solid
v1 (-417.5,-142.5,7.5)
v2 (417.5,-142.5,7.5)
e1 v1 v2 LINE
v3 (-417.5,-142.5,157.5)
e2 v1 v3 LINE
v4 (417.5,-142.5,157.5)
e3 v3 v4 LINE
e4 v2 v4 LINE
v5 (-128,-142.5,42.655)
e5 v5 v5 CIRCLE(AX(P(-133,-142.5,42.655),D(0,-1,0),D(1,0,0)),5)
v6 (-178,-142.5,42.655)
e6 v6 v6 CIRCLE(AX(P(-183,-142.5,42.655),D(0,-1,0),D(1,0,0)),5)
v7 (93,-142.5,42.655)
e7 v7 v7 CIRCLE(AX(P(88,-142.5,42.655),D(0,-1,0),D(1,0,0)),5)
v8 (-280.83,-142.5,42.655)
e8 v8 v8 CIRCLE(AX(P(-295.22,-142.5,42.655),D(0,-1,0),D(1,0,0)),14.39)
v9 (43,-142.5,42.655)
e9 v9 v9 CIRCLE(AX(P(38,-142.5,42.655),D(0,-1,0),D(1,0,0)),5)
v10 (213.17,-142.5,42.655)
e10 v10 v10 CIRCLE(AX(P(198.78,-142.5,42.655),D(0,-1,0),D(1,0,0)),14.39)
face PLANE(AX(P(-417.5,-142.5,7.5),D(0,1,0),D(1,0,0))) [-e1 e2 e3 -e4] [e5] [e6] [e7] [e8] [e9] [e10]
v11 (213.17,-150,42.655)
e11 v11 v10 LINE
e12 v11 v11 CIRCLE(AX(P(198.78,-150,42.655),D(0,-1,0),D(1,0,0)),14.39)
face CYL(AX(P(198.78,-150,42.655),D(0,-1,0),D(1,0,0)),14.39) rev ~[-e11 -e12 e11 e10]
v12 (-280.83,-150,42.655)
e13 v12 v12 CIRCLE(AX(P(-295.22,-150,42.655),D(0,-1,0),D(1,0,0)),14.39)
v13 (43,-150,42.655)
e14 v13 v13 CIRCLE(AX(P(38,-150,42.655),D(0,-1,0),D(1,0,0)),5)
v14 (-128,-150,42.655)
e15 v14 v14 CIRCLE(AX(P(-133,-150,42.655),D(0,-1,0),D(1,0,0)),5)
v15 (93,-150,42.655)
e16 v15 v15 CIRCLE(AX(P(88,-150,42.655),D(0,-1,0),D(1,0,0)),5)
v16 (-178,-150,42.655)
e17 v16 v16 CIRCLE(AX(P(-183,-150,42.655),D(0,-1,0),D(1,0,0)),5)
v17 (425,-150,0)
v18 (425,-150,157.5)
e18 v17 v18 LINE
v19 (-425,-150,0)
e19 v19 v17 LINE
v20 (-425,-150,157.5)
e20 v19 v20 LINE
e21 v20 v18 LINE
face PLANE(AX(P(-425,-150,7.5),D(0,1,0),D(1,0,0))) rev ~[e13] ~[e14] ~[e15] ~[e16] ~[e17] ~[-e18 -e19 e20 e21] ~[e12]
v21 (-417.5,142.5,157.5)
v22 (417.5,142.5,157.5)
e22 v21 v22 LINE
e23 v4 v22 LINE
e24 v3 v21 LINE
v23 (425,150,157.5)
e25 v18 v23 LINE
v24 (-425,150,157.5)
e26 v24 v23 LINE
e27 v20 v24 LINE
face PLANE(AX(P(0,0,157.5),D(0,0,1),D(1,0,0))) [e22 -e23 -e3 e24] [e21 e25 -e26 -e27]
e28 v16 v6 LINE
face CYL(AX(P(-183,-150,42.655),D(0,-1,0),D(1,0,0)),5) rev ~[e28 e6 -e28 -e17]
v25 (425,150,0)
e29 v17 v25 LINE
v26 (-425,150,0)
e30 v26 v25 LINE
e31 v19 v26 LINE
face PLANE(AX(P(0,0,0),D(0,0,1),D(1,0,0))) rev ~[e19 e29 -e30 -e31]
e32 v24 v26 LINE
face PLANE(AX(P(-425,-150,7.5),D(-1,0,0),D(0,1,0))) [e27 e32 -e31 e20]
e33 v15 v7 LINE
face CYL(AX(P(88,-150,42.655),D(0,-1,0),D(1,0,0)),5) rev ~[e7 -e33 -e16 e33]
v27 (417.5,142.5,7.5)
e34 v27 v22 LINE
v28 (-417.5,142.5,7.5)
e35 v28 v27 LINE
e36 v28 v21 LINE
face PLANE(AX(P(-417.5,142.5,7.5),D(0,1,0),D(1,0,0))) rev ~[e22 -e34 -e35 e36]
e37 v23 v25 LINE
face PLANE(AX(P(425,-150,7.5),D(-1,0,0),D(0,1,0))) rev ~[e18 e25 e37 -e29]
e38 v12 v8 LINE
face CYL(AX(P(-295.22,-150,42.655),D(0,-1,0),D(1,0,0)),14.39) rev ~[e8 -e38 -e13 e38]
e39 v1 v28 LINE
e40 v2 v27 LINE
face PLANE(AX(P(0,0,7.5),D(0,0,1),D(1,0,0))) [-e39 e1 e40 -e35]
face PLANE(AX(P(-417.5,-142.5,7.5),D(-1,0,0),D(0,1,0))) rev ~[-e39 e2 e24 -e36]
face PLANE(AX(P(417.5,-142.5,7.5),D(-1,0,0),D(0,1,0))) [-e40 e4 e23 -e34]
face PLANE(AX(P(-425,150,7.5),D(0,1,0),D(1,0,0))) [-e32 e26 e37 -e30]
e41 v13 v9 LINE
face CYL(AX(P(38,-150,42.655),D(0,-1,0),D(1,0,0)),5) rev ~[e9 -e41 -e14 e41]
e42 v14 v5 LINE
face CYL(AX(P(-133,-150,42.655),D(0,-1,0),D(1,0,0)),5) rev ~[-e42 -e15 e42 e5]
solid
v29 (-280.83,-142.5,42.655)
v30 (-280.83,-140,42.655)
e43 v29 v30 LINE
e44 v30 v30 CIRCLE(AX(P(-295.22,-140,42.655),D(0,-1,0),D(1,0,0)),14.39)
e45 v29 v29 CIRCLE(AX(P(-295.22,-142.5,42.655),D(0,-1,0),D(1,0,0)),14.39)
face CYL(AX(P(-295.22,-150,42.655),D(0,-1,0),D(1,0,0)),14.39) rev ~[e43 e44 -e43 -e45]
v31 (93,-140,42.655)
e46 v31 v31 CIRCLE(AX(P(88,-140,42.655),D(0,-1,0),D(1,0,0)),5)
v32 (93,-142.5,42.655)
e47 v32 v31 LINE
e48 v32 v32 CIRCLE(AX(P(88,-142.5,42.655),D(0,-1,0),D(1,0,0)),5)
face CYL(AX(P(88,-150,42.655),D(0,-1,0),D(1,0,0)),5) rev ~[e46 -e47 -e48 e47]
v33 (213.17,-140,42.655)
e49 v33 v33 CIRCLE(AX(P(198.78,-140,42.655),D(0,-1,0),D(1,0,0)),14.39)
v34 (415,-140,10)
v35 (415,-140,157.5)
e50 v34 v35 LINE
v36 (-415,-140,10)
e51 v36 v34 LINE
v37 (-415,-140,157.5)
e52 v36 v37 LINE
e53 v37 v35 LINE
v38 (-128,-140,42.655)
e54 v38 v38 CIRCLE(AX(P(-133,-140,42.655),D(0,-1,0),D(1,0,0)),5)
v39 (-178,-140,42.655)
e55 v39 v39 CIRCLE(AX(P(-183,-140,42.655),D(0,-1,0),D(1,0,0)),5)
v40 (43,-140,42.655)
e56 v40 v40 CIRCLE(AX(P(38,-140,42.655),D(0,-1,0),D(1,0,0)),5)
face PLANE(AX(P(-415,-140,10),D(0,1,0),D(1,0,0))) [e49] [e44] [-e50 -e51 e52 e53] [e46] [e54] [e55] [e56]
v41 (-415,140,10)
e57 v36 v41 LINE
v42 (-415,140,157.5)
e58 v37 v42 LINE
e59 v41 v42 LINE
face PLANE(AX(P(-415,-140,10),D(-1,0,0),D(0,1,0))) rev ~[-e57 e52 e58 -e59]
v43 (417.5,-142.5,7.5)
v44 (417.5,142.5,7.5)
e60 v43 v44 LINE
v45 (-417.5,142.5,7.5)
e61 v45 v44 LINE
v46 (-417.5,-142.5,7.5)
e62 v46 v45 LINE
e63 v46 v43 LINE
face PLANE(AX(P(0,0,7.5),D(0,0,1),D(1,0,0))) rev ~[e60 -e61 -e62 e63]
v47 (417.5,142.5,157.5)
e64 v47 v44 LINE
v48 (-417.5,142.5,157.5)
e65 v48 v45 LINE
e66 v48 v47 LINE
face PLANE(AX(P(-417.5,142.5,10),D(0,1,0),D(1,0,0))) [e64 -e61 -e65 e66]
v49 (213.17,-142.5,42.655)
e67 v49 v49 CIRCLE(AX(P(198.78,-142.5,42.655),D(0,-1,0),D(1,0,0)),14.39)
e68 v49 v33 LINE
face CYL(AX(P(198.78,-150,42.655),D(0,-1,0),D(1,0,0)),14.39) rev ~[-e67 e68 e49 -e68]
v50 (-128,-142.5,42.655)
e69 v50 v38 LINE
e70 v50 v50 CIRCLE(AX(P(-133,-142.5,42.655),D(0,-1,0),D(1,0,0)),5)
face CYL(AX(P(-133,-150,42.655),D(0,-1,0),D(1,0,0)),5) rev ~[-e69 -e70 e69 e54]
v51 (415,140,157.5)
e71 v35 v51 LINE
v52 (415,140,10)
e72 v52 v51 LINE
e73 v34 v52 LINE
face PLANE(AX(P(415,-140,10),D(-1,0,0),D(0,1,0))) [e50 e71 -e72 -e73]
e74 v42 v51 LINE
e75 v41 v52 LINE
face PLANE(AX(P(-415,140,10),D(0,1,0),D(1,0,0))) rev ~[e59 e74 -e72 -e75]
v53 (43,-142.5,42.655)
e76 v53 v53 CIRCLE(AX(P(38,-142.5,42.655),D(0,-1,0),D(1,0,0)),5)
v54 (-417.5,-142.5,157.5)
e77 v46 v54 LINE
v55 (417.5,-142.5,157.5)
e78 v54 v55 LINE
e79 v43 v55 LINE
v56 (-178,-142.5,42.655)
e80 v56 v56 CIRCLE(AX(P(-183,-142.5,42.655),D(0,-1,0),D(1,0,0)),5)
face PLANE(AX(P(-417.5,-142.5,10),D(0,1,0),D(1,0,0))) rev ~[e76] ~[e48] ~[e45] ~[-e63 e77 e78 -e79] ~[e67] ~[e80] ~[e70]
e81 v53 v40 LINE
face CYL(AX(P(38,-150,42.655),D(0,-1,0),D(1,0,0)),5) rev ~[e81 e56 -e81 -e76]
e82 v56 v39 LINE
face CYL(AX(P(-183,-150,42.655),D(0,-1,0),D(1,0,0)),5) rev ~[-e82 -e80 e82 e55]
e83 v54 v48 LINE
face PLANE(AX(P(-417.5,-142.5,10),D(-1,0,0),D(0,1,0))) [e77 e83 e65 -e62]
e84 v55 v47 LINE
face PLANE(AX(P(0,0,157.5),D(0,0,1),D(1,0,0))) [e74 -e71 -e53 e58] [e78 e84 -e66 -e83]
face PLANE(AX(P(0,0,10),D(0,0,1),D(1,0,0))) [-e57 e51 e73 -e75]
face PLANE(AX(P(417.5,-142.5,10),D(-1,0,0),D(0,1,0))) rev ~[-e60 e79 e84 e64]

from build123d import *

# Parameters (mm, degrees)
F0_W     = 850
F0_H     = 300
F1_DEPTH = 7.5
F2_W     = 850
F2_H     = 300
F2_W_2   = 835
F2_H_2   = 285
F3_DEPTH = 150
F4_DEPTH = 2.5
F5_W     = 835
F5_H     = 285
F5_W_2   = 830
F5_H_2   = 280
F6_DEPTH = 147.5
F7_R     = 5
F7_R_2   = 14.39
F8_DEPTH = 25


with BuildPart() as f1:
    # F0 (on Top) → F1 (new body)
    with BuildSketch(Plane.XY):
        Rectangle(F0_W, F0_H)
    extrude(amount=F1_DEPTH)

    # F2 (on face) → F3 (join)
    with BuildSketch(Plane.XY.offset(7.5)):
        Rectangle(F2_W, F2_H)
        Rectangle(F2_W_2, F2_H_2, mode=Mode.SUBTRACT)
    extrude(amount=F3_DEPTH)


with BuildPart() as f4:
    # F4 (new): a face of the model
    f4_faces = [f1.part.faces().sort_by_distance(p)[0] for p in [
        (0, 0, 7.5),
    ]]
    extrude(f4_faces, amount=F4_DEPTH)

    # F5 (on face) → F6 (join)
    with BuildSketch(Plane.XY.offset(10)):
        Rectangle(F5_W, F5_H)
        Rectangle(F5_W_2, F5_H_2, mode=Mode.SUBTRACT)
    extrude(amount=F6_DEPTH)


with BuildPart() as f8_tool:
    # F7 (on face) → F8 (new body)
    with BuildSketch(Plane.XZ.offset(150)):
        with Locations((-133, 42.655)):
            Circle(F7_R)
        with Locations((38, 42.655)):
            Circle(F7_R)
        with Locations((88, 42.655)):
            Circle(F7_R)
        with Locations((-183, 42.655)):
            Circle(F7_R)
        with Locations((198.78, 42.655)):
            Circle(F7_R_2)
        with Locations((-295.22, 42.655)):
            Circle(F7_R_2)
    extrude(amount=-F8_DEPTH)


with BuildPart() as f1_1:
    add(f1.part)

    # F8: cut by f8_tool
    add(f8_tool.part, mode=Mode.SUBTRACT)


with BuildPart() as f4_1:
    add(f4.part)

    # F8: cut by f8_tool
    add(f8_tool.part, mode=Mode.SUBTRACT)


solid = Compound([f1_1.part, f4_1.part])
